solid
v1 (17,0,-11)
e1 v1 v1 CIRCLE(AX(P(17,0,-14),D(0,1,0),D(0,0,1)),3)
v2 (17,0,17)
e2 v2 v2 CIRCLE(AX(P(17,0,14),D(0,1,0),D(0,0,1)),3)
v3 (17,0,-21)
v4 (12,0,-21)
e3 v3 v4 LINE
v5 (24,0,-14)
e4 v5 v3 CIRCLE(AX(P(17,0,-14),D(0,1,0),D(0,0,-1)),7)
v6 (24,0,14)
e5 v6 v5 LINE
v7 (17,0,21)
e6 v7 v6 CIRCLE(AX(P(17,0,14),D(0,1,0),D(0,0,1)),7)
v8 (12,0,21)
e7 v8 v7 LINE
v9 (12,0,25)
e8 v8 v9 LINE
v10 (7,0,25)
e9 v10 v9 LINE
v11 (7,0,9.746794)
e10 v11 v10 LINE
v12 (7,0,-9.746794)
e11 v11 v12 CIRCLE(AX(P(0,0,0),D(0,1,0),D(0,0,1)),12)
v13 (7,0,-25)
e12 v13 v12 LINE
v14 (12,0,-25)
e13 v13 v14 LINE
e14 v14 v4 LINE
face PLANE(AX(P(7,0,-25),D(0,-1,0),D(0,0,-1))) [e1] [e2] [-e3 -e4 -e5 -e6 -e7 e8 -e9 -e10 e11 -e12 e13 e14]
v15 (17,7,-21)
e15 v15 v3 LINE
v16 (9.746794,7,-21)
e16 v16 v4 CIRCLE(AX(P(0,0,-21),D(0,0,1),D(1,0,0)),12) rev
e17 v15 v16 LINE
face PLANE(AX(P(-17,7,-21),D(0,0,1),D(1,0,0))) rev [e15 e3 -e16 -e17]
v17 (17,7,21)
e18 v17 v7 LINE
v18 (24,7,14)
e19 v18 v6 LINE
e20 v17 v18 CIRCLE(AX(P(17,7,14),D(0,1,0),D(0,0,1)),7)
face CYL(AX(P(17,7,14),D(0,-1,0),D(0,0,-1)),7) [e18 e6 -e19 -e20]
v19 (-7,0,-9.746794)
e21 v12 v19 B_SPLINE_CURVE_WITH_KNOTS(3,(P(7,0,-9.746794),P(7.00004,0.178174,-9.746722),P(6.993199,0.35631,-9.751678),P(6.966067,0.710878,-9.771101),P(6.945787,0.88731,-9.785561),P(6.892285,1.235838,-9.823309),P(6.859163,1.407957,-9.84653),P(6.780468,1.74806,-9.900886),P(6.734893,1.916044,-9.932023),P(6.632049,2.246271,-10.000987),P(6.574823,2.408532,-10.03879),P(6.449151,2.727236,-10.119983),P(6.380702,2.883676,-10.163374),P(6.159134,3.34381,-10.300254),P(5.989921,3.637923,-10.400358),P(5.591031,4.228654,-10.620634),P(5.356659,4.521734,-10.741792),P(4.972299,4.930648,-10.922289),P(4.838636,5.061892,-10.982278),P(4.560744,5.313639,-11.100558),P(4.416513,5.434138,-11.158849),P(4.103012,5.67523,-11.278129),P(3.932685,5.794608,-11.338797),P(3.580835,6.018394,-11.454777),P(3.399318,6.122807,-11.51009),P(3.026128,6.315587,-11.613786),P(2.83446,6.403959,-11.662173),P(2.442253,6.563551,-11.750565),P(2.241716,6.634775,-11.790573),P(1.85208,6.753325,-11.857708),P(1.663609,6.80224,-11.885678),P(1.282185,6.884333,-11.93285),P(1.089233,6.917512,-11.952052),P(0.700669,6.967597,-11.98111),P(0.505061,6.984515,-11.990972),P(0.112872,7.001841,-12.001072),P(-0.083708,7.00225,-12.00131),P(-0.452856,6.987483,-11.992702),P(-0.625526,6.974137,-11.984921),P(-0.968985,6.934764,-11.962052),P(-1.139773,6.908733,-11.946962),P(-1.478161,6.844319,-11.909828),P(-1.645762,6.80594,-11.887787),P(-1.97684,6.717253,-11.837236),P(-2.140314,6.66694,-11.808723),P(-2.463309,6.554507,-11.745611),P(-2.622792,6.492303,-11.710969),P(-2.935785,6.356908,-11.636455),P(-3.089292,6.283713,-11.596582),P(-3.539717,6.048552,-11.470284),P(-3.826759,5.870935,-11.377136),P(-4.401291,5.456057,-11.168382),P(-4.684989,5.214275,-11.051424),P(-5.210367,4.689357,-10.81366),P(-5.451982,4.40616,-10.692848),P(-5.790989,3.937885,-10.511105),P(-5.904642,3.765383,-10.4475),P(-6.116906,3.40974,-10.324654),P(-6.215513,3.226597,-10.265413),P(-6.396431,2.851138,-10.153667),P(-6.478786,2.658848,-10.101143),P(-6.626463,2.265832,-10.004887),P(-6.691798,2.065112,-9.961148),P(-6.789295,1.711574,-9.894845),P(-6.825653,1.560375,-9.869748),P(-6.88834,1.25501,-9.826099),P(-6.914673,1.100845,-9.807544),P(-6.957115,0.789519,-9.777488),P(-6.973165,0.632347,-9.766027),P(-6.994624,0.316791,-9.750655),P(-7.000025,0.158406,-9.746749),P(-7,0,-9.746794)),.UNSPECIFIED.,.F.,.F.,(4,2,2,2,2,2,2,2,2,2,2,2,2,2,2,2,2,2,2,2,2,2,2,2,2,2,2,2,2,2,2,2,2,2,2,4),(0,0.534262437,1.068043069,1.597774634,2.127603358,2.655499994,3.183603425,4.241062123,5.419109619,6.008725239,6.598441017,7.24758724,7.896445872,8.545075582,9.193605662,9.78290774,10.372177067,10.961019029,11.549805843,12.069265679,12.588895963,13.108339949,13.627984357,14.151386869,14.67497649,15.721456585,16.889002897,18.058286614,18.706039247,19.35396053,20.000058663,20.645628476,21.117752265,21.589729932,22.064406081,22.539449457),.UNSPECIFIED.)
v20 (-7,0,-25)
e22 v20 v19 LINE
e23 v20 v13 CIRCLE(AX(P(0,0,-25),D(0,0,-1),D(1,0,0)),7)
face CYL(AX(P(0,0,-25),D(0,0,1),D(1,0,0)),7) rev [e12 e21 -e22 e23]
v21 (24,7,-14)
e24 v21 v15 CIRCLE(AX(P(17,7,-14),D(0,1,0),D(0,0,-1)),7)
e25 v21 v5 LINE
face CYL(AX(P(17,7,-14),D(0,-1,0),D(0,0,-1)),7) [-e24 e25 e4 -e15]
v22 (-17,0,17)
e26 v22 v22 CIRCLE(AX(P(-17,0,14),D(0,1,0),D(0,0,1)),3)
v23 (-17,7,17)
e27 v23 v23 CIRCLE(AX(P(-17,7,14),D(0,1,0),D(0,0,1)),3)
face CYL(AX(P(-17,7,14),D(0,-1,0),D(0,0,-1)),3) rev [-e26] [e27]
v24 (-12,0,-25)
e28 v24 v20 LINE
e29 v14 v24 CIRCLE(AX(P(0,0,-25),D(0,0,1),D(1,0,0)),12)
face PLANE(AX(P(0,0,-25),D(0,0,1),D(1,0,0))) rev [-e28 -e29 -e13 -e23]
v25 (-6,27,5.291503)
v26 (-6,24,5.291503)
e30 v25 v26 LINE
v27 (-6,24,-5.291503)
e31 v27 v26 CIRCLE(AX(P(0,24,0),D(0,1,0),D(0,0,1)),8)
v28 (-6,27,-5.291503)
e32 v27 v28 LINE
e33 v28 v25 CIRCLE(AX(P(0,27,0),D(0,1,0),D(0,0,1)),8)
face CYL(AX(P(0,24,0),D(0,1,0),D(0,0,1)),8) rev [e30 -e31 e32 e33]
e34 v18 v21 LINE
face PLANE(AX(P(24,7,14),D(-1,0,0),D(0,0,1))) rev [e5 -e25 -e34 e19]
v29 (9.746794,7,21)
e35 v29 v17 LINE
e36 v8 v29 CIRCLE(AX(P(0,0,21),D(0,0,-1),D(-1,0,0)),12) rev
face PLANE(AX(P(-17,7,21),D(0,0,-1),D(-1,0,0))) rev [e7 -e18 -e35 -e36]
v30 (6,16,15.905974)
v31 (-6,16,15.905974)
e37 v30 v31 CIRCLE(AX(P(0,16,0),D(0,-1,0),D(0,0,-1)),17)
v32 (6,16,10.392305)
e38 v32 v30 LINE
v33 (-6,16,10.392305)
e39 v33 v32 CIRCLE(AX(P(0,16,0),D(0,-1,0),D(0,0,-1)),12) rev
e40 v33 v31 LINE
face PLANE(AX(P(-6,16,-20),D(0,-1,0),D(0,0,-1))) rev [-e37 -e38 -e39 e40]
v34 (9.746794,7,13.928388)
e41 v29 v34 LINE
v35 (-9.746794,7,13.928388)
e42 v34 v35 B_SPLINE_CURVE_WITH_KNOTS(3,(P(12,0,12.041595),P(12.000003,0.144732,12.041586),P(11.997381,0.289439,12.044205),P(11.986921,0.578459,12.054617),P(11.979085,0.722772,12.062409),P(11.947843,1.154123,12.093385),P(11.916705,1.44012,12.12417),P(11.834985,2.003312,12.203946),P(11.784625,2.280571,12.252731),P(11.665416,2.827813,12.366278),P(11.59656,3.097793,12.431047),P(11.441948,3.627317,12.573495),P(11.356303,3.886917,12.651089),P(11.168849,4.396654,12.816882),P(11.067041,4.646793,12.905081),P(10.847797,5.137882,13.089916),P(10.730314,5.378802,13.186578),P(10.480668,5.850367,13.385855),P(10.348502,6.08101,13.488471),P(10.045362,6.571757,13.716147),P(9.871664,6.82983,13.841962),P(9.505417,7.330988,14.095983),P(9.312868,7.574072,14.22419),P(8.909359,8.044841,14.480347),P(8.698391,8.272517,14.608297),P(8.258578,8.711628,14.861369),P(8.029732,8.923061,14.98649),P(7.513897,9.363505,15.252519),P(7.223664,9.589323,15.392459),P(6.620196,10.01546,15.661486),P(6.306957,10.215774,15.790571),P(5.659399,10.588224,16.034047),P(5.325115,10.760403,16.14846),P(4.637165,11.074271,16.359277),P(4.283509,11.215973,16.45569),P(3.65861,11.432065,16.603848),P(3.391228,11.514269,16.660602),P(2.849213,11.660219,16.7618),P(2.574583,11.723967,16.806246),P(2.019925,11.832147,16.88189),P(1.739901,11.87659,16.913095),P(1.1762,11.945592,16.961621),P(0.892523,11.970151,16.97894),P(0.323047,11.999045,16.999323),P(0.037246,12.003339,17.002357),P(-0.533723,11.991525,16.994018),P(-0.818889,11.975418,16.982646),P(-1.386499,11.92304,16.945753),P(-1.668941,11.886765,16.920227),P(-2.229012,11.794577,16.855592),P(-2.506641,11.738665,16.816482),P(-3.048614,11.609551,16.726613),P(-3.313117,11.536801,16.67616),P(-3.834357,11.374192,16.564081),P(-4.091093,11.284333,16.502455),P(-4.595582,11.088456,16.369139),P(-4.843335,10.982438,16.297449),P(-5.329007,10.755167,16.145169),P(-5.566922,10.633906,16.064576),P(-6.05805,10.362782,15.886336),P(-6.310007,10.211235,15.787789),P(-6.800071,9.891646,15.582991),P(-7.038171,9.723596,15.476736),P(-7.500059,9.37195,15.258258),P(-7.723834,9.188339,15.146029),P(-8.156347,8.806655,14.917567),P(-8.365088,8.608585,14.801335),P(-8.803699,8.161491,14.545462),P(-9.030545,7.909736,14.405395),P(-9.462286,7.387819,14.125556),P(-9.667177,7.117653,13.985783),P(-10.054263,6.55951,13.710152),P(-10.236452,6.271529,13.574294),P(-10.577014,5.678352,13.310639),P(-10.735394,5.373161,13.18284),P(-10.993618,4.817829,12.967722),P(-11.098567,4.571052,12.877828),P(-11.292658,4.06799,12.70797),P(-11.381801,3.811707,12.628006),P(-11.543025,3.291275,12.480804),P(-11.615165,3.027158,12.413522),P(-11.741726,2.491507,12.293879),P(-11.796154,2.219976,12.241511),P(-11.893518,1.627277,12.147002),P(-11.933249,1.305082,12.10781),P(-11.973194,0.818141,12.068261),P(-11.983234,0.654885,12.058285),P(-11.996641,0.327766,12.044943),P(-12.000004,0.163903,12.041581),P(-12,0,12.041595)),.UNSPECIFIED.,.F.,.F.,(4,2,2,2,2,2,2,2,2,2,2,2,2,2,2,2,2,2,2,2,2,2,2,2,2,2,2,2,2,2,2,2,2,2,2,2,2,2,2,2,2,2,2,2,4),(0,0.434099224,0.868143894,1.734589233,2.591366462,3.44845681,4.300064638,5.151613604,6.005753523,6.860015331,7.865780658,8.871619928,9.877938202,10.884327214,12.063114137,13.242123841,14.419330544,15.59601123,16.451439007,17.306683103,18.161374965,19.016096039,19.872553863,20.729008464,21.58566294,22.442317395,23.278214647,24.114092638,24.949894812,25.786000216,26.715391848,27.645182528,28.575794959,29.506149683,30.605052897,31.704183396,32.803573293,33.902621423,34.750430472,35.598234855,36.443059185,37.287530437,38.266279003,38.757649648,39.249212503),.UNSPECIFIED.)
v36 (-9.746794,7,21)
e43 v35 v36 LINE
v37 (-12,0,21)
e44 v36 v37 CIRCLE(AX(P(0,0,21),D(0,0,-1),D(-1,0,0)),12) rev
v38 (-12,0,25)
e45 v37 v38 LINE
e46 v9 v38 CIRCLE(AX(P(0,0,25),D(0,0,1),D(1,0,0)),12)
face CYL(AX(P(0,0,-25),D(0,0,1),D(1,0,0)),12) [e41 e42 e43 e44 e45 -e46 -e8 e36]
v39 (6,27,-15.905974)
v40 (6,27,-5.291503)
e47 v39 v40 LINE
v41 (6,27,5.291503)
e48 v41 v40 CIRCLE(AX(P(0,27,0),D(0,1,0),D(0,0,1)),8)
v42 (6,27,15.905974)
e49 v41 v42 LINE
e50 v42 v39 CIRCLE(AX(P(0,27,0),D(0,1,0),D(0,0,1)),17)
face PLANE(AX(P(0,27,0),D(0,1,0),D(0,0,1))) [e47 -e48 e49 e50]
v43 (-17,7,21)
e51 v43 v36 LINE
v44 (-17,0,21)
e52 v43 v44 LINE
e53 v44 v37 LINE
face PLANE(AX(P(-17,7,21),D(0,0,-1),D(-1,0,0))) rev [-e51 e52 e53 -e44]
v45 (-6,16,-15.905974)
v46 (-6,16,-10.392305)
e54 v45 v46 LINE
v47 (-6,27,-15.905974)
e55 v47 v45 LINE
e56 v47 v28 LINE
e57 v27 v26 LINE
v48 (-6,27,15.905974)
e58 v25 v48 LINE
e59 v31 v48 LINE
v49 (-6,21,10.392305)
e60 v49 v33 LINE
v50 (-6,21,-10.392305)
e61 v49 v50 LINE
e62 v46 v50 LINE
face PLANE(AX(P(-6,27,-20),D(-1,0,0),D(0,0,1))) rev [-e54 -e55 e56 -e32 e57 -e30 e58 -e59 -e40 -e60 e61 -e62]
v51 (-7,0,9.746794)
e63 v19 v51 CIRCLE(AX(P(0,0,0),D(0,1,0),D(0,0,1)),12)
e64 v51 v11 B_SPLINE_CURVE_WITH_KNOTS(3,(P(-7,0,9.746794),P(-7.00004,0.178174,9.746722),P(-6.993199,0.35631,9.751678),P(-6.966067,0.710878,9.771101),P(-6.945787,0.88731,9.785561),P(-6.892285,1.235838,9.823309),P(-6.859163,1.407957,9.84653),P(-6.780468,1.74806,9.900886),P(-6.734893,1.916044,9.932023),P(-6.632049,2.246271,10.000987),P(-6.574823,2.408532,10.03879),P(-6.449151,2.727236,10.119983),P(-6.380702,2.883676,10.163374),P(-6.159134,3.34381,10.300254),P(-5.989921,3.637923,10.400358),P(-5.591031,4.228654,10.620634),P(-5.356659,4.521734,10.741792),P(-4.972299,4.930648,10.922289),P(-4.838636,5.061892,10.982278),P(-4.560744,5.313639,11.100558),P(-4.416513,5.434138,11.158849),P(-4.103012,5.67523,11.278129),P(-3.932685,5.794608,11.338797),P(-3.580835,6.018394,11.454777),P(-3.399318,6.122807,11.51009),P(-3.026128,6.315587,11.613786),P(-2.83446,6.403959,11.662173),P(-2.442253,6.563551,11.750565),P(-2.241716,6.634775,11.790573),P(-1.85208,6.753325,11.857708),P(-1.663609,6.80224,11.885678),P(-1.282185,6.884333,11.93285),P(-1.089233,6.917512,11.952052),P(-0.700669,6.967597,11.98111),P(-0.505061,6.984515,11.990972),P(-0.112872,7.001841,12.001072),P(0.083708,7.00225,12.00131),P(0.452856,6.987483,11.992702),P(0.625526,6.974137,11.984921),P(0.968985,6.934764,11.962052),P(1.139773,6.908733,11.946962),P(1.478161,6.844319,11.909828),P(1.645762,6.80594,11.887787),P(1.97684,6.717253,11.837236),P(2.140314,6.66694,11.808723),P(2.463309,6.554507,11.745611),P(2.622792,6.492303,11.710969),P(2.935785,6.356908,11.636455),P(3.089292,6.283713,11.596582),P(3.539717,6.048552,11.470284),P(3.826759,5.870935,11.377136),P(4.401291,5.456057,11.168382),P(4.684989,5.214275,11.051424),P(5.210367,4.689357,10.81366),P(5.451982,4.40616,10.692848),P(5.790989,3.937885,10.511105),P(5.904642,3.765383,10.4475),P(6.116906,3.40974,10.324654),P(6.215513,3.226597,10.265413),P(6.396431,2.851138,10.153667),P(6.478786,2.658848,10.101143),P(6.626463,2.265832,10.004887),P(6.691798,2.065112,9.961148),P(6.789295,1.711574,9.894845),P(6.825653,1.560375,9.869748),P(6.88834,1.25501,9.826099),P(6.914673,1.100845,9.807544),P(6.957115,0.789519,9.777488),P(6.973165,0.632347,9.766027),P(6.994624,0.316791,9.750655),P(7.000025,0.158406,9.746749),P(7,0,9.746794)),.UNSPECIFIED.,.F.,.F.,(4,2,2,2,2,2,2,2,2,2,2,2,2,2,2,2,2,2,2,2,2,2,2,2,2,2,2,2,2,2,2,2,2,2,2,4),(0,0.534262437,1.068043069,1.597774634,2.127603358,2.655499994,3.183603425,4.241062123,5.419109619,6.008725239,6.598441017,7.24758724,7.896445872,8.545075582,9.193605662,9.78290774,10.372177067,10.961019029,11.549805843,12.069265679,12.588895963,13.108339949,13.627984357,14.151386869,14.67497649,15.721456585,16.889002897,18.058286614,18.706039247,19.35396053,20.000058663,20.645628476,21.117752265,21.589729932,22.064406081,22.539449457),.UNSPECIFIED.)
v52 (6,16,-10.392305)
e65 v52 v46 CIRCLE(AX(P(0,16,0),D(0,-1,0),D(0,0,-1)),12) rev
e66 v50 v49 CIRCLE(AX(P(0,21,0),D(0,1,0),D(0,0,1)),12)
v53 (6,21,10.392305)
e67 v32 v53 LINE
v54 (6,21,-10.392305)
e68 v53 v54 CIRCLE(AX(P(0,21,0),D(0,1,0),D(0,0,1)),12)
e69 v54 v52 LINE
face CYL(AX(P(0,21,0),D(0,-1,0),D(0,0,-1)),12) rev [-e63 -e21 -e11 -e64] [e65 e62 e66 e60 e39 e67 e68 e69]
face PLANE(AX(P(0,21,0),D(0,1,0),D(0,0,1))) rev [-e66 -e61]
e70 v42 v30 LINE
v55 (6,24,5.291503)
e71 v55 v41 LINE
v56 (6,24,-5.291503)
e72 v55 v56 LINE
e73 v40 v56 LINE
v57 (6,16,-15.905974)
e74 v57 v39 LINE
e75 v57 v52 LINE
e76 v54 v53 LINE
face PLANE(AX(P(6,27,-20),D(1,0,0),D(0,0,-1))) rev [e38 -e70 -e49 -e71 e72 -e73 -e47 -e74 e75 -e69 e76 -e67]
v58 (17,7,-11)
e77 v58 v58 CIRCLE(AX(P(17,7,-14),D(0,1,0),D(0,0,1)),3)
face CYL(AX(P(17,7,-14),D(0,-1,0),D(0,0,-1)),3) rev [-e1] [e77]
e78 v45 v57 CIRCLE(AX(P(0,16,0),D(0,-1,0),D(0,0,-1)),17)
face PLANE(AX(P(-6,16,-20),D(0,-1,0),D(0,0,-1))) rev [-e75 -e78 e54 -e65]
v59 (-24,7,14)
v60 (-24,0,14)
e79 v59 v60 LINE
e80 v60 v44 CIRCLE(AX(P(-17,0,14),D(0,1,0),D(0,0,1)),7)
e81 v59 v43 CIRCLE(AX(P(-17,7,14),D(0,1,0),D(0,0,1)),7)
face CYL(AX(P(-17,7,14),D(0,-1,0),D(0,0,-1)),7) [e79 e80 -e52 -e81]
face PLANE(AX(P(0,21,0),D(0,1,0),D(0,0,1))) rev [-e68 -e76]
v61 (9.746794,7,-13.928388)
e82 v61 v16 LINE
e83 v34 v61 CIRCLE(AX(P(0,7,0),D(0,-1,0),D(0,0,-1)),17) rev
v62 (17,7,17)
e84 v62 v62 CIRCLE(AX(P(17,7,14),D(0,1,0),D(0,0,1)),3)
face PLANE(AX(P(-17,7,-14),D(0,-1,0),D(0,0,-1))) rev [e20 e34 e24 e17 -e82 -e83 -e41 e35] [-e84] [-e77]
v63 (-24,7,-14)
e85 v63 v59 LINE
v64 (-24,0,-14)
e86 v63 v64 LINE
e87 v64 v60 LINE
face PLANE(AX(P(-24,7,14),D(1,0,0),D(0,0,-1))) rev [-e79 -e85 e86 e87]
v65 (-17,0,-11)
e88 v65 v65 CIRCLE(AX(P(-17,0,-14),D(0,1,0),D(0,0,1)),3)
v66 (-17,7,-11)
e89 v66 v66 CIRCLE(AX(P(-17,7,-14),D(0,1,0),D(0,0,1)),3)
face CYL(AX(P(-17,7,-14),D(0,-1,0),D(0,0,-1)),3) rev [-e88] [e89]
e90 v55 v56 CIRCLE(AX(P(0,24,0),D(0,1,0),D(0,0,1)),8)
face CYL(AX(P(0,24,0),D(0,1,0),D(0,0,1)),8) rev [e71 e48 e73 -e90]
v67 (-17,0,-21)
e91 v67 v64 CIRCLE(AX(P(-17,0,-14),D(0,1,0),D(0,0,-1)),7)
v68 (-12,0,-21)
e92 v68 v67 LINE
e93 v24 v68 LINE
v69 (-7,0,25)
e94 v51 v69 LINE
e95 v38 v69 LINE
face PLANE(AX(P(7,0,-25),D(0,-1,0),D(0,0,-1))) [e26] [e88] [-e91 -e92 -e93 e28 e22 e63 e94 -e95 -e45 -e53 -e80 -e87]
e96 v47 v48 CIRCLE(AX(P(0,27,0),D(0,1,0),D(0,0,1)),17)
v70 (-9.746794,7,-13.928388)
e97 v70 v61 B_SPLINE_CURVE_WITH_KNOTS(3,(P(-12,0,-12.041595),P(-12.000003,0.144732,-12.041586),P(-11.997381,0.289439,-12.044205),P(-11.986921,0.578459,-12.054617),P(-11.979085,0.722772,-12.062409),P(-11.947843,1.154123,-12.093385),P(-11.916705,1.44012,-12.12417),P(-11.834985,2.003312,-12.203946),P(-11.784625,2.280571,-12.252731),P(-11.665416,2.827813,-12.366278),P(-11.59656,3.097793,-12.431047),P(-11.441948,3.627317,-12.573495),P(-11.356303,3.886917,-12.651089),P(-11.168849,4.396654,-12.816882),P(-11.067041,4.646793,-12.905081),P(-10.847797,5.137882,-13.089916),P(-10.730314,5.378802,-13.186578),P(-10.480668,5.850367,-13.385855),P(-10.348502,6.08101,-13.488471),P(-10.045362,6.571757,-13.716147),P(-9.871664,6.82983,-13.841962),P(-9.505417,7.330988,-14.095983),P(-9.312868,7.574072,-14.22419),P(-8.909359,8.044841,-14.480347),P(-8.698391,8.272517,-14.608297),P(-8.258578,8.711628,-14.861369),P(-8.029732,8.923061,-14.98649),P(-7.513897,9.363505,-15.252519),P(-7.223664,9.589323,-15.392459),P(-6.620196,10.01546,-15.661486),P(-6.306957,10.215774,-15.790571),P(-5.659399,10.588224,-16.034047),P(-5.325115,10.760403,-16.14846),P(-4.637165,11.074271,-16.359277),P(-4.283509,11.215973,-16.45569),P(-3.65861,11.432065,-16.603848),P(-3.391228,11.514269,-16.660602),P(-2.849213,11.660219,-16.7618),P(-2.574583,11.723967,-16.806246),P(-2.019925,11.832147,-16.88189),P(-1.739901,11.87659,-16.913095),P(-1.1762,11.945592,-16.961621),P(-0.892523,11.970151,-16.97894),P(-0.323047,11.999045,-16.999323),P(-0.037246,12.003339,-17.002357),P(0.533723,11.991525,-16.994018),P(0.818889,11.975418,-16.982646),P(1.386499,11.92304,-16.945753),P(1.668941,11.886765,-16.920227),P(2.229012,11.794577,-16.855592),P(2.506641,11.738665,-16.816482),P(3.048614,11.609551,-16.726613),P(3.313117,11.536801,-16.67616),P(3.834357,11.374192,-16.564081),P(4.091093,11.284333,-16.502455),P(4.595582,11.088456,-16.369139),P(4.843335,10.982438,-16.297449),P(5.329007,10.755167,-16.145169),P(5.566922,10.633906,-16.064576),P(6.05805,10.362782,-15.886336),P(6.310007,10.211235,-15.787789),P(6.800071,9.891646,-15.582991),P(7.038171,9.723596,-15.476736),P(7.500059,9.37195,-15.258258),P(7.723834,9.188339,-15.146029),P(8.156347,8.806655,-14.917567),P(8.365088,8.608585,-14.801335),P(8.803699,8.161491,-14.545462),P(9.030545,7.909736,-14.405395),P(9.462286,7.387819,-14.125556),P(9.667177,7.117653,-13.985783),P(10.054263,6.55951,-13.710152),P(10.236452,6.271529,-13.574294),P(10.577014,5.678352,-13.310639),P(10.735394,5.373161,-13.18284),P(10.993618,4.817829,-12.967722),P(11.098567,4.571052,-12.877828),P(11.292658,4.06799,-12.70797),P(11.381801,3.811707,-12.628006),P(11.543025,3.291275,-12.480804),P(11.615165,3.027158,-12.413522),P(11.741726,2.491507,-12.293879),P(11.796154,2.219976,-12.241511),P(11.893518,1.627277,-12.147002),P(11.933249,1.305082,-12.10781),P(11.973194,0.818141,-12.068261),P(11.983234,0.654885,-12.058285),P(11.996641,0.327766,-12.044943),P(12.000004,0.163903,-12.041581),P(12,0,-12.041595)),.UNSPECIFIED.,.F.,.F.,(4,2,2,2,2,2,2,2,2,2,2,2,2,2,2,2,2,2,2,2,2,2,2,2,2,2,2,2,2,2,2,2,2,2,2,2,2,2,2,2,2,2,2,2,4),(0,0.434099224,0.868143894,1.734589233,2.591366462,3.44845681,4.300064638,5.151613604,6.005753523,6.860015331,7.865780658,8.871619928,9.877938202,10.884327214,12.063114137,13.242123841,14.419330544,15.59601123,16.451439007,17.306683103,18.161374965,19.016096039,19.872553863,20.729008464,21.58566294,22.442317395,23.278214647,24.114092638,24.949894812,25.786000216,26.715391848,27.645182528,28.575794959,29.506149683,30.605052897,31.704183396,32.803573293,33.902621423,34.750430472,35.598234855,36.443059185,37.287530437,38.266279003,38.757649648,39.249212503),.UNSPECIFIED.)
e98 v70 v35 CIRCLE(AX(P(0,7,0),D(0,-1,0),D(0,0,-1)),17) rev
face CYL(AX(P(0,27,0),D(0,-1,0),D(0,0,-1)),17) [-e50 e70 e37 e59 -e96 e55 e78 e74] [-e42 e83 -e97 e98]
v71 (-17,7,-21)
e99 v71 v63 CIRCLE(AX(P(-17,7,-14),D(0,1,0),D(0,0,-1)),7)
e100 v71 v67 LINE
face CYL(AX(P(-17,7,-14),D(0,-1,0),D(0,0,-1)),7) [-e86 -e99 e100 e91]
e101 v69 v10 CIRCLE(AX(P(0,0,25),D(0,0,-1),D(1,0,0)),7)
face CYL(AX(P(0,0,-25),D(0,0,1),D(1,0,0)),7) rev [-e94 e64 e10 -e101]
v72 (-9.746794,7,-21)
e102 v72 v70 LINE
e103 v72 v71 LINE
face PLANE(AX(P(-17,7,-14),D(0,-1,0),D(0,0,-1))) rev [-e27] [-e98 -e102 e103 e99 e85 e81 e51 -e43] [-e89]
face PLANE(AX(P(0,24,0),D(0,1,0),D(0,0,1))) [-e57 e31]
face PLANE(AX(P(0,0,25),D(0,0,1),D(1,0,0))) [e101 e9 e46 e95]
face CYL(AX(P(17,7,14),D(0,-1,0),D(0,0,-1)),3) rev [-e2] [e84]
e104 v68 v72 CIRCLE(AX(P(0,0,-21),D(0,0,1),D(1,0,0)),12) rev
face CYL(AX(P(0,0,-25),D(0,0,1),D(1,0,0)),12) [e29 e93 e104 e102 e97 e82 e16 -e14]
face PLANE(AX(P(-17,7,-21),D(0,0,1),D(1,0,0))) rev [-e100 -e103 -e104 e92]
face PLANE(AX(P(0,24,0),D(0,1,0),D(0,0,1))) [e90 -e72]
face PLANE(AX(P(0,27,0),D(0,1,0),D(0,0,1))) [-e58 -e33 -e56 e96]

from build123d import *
from build123d.topology import SkipClean

# Parameters (mm, degrees)
EXTRUDE_1_DEPTH     = 50
SKETCH_7_R          = 3
EXTRUDE_2_DEPTH     = 7
SKETCH_8_R          = 17
EXTRUDE_3_DEPTH     = 27
SKETCH_9_R          = 8
CUT_EXTRUDE_1_DEPTH = 3
SKETCH_11_W         = 12
SKETCH_11_H         = 11
CUT_EXTRUDE_3_DEPTH = 20
SKETCH_12_R         = 12
CUT_EXTRUDE_4_DEPTH = 21
SKETCH_13_R         = 7
CUT_EXTRUDE_5_DEPTH = 62.684682178


with BuildPart() as part:
    # 草图1 → 凸台-拉伸1 (new body)
    with BuildSketch(Plane.XY.offset(25)):
        with BuildLine():
            Line((-12, 0), (-7, 0))
            ThreePointArc((-7, 0), (0, 7), (7, 0))
            Line((7, 0), (12, 0))
            ThreePointArc((12, 0), (0, 12), (-12, 0))
        make_face()
    extrude(amount=-EXTRUDE_1_DEPTH)

    # 草图7 → 凸台-拉伸2 (add)
    with BuildSketch(Plane(origin=(0, 0, 0), x_dir=(1, 0, 0), z_dir=(0, 1, 0))):
        with BuildLine():
            Line((-17, -21), (17, -21))
            ThreePointArc((17, -21), (21.949747468, -18.949747468), (24, -14))
            Line((24, -14), (24, 14))
            ThreePointArc((24, 14), (21.949747468, 18.949747468), (17, 21))
            Line((17, 21), (-17, 21))
            ThreePointArc((-17, 21), (-21.949747468, 18.949747468), (-24, 14))
            Line((-24, 14), (-24, -14))
            ThreePointArc((-24, -14), (-21.949747468, -18.949747468), (-17, -21))
        make_face()
        with Locations((-17, 14)):
            Circle(SKETCH_7_R, mode=Mode.SUBTRACT)
        with Locations((17, 14)):
            Circle(SKETCH_7_R, mode=Mode.SUBTRACT)
        with Locations((17, -14)):
            Circle(SKETCH_7_R, mode=Mode.SUBTRACT)
        with Locations((-17, -14)):
            Circle(SKETCH_7_R, mode=Mode.SUBTRACT)
    extrude(amount=EXTRUDE_2_DEPTH)

    # 草图8 → 凸台-拉伸3 (add)
    with BuildSketch(Plane(origin=(0, 0, 0), x_dir=(1, 0, 0), z_dir=(0, 1, 0))):
        Circle(SKETCH_8_R)
    extrude(amount=EXTRUDE_3_DEPTH)

    # 草图9 → 切除-拉伸1 (cut)
    with BuildSketch(Plane(origin=(0, 27, 0), x_dir=(1, 0, 0), z_dir=(0, 1, 0))):
        Circle(SKETCH_9_R)
    extrude(amount=-CUT_EXTRUDE_1_DEPTH, mode=Mode.SUBTRACT)

    # 草图11 → 切除-拉伸3 (cut, symmetric)
    with BuildSketch(Plane.XY):
        with Locations((0, 21.5)):
            Rectangle(SKETCH_11_W, SKETCH_11_H)
    extrude(amount=CUT_EXTRUDE_3_DEPTH, both=True, mode=Mode.SUBTRACT)

    # 草图12 → 切除-拉伸4 (cut)
    with BuildSketch(Plane(origin=(0, 0, 0), x_dir=(1, 0, 0), z_dir=(0, 1, 0))):
        Circle(SKETCH_12_R)
    extrude(amount=CUT_EXTRUDE_4_DEPTH, mode=Mode.SUBTRACT)

    # 草图13 → 切除-拉伸5 (cut, through all)
    with SkipClean():  # the faces are left unmerged after this step: merging them gives an invalid solid
        with BuildSketch(Plane.XY.offset(25)):
            Circle(SKETCH_13_R)
        extrude(amount=-CUT_EXTRUDE_5_DEPTH, mode=Mode.SUBTRACT)
    add(part.part.scale(1), mode=Mode.REPLACE)  # the faces are merged on a copy


solid = part.part
